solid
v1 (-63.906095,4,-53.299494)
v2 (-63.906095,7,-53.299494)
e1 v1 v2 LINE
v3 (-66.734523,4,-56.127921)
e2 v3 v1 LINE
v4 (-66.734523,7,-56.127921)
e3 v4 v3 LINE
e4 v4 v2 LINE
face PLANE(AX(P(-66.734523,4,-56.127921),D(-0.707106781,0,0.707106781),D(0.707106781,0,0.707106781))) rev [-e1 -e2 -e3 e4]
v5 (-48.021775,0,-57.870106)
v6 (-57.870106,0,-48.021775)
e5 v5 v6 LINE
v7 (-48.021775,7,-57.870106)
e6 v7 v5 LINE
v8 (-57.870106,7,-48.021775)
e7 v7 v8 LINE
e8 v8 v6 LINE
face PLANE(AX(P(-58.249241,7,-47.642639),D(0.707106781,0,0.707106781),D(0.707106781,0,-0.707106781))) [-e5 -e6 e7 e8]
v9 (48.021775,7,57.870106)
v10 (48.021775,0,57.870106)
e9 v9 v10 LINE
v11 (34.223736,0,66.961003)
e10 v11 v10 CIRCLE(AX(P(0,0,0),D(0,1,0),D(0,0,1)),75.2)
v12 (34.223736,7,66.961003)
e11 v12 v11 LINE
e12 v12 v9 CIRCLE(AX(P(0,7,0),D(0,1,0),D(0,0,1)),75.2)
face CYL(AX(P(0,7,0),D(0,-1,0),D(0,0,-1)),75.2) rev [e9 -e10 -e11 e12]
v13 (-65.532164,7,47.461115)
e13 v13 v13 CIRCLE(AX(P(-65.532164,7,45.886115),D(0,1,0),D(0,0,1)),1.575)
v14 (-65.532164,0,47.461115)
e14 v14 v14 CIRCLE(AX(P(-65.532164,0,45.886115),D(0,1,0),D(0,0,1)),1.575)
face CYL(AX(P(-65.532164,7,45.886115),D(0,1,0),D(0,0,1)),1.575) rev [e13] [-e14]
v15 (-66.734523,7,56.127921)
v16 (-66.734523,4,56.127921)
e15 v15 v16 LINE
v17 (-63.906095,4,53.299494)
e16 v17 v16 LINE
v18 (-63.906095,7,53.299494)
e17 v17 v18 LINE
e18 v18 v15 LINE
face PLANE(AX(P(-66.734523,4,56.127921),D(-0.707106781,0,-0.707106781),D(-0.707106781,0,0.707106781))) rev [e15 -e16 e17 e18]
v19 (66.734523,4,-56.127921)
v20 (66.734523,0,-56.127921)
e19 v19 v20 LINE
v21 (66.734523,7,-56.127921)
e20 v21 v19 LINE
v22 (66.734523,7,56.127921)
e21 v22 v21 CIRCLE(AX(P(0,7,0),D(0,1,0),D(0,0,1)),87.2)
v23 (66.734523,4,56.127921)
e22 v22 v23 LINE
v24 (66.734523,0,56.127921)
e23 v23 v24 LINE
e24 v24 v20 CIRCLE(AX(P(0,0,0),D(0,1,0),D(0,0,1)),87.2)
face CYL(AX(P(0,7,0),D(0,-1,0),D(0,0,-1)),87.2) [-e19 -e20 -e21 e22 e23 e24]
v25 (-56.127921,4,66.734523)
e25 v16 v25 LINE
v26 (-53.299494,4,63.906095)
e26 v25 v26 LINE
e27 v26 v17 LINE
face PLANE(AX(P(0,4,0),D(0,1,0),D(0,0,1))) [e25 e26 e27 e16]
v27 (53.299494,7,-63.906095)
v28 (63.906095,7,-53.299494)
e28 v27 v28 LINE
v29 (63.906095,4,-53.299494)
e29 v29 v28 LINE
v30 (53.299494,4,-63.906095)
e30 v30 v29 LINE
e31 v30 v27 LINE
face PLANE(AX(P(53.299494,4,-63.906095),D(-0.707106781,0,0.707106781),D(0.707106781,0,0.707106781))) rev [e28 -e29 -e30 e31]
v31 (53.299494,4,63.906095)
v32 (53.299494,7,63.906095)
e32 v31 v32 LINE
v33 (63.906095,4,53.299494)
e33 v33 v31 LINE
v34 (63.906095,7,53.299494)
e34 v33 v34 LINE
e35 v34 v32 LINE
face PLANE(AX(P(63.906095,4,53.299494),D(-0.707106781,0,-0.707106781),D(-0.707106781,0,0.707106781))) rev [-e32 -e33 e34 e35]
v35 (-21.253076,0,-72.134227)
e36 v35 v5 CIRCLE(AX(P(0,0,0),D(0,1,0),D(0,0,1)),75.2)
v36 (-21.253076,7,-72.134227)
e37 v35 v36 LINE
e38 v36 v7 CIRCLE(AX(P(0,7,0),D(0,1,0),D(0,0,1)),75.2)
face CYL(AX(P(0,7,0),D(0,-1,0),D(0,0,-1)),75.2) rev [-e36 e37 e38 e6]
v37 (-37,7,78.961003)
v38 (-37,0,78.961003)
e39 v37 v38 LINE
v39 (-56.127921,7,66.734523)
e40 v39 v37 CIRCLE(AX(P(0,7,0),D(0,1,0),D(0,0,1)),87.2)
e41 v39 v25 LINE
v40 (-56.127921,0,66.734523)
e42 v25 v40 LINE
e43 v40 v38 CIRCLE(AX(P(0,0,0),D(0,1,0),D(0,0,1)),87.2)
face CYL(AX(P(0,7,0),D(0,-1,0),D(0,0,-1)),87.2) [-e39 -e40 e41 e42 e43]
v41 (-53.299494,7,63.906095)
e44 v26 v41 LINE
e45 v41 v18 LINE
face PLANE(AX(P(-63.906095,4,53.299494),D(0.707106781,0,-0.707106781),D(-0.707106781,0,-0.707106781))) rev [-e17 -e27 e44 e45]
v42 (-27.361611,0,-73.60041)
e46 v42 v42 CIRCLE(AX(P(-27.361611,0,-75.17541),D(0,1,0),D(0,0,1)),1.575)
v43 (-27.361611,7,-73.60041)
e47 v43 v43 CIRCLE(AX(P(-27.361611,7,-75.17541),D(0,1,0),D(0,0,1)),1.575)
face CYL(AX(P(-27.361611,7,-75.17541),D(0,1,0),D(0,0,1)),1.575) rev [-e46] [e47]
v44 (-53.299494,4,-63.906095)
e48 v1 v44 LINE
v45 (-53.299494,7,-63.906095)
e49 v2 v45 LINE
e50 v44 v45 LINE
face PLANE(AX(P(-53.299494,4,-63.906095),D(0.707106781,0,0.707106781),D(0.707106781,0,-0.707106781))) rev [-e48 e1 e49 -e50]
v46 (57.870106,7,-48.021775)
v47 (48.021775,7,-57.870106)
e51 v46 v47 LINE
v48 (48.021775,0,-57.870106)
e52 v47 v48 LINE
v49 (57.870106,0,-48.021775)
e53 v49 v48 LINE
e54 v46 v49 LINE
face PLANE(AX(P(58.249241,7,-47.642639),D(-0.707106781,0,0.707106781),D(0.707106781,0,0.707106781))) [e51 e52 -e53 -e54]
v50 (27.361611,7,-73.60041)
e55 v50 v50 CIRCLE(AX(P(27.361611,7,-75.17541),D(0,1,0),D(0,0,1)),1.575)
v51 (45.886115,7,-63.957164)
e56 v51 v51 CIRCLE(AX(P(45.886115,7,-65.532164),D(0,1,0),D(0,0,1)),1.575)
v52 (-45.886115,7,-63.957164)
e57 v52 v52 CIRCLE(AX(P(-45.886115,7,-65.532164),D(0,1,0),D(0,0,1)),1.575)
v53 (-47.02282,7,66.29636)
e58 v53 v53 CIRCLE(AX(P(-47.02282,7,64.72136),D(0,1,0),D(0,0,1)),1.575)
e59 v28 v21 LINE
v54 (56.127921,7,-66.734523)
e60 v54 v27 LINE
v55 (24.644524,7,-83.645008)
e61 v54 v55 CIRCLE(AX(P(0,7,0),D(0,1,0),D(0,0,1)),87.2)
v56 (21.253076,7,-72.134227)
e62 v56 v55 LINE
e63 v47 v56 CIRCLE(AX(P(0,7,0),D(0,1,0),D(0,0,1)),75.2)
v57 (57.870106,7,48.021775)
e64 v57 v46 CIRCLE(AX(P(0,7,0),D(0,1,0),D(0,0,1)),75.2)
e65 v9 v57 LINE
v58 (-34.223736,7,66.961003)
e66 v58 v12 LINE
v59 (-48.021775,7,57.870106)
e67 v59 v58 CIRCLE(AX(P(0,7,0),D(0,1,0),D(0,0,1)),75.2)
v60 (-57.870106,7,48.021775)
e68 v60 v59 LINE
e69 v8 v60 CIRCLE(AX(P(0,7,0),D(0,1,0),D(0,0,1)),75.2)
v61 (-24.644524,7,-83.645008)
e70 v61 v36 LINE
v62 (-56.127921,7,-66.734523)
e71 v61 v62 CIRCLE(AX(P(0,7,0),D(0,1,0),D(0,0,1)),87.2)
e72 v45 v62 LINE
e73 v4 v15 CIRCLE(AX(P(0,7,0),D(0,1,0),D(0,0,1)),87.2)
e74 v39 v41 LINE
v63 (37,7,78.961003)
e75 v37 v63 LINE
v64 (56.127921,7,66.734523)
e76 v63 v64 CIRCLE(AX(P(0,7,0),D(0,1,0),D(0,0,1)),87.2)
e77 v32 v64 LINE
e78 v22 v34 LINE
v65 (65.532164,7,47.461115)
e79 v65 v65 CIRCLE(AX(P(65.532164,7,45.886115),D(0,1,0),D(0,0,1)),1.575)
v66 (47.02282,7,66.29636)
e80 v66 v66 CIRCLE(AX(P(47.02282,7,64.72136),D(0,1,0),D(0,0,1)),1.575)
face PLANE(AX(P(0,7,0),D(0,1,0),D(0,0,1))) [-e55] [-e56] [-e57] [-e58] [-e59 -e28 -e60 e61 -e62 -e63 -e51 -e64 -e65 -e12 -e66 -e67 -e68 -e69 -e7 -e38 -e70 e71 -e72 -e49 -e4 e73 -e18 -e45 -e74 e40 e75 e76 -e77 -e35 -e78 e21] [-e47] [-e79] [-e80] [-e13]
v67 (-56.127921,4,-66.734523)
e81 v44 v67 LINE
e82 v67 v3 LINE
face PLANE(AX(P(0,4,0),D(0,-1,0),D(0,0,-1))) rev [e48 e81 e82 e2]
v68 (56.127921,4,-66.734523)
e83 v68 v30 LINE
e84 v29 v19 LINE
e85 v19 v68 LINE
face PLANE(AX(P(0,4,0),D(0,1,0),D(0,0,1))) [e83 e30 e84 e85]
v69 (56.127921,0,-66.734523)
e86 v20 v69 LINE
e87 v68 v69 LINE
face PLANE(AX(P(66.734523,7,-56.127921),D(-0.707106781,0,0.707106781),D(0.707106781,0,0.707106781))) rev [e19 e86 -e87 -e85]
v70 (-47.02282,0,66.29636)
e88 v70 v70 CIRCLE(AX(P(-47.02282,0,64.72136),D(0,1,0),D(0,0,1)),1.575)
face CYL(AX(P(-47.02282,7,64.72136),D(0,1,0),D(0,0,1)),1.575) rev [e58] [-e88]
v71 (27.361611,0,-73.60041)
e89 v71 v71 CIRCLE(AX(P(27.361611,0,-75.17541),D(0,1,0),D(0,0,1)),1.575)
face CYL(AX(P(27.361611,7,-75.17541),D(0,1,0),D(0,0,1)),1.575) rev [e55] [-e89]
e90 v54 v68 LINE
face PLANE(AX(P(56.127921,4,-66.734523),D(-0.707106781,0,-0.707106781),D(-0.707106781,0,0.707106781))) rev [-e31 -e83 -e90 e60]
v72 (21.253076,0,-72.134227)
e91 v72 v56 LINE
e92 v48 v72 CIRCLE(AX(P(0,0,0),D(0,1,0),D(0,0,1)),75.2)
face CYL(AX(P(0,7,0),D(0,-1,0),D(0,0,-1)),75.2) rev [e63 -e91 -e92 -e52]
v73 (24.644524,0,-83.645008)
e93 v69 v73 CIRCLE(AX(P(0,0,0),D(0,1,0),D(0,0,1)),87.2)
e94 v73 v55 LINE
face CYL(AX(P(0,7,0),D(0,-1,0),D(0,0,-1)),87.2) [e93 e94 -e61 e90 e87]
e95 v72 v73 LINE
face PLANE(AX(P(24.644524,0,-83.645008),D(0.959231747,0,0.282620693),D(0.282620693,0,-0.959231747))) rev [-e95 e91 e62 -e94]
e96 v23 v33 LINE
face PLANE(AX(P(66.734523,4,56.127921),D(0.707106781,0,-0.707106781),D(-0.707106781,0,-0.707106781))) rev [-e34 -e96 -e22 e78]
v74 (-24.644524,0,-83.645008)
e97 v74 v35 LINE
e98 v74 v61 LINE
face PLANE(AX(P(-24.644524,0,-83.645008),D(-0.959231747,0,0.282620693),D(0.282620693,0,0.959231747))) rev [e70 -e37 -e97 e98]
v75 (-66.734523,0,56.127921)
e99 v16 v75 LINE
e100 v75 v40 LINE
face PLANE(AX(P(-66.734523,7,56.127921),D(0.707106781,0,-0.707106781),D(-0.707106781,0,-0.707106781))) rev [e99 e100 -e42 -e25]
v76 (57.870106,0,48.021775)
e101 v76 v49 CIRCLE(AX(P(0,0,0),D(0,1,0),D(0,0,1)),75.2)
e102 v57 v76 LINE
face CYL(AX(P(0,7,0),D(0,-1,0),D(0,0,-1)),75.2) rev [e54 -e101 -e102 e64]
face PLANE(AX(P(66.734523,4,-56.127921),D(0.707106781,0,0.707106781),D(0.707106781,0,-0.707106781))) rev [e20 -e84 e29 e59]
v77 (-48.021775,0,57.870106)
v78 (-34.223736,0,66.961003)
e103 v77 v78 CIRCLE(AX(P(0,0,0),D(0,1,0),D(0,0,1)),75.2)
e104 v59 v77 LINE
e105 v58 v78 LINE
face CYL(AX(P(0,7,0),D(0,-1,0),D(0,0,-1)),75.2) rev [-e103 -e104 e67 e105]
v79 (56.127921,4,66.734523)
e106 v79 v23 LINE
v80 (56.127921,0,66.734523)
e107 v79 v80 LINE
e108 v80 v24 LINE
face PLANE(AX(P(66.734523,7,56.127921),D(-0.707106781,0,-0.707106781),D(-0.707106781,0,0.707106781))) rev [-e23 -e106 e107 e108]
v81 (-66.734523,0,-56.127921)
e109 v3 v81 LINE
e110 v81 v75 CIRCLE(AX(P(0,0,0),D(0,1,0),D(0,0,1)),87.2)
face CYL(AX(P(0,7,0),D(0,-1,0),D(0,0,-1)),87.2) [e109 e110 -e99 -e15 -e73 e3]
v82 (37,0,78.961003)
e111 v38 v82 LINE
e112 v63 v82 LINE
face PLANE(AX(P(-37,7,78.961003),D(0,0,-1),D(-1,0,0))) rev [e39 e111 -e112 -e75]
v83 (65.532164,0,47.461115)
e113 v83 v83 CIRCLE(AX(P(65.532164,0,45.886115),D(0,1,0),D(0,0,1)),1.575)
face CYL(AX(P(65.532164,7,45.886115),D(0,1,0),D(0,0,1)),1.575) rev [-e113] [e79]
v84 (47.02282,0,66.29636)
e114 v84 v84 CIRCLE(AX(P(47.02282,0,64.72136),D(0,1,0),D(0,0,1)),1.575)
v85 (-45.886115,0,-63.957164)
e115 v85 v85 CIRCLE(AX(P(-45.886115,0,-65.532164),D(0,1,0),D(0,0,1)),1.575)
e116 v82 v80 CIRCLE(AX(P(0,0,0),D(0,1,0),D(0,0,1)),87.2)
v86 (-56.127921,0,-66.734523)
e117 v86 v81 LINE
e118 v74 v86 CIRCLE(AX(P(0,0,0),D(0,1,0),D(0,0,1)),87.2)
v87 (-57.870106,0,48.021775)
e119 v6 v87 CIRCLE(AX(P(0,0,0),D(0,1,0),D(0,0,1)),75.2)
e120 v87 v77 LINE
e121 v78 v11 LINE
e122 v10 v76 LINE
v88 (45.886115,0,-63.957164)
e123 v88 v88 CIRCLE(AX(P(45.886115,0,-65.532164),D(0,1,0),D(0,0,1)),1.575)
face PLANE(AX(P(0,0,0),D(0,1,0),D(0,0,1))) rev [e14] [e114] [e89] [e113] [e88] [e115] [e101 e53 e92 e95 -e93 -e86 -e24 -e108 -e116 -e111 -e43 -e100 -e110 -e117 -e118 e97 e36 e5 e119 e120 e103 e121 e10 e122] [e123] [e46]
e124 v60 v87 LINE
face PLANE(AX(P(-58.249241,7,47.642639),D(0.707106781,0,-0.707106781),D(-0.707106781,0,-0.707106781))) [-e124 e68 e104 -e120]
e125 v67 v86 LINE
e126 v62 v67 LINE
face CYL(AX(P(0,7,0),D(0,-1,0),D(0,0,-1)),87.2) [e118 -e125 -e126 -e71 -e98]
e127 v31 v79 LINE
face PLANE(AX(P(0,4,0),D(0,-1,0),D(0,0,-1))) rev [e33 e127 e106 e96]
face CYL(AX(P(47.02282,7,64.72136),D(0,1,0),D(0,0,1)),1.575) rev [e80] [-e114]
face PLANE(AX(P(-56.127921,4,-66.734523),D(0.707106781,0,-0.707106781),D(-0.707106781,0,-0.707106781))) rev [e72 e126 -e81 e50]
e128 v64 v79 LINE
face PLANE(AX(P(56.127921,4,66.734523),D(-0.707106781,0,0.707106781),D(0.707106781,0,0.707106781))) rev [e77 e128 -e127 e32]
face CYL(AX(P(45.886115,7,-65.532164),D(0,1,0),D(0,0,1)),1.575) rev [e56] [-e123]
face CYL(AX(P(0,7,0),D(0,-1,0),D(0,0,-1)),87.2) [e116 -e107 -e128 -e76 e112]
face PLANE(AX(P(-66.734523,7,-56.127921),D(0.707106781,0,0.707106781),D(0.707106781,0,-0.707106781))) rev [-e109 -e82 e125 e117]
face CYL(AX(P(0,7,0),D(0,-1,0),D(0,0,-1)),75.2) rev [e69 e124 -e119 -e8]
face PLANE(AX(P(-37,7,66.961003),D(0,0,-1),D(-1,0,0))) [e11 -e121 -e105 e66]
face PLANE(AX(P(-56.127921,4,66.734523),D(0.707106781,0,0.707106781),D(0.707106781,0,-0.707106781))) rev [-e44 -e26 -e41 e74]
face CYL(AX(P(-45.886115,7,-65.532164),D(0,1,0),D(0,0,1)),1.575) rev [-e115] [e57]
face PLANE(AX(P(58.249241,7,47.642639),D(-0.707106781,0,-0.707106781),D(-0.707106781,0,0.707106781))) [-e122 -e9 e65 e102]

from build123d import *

# Parameters (mm, degrees)
RESSALTO_EXTRUS_O1_DEPTH                = 7
CASCA1_DEPTH                            = 7
FURO_ROSCADO_PARA_CONDU_TE_DE_M3X0_51_D = 3.15
CORTE_EXTRUS_O1_DEPTH                   = 124.517933921
CORTE_EXTRUS_O2_DEPTH                   = 3


# Read off the part's stored shape, not the designer's step: Casca1
with BuildPart() as part:
    # Esboço1 → Ressalto-extrusão1 (new body)
    with BuildSketch(Plane(origin=(0, 0, 0), x_dir=(1, 0, 0), z_dir=(0, 1, 0))):
        with BuildLine():
            Line((-37, -78.961003033), (37, -78.961003033))
            ThreePointArc((37, -78.961003033), (46.963540288, -73.472892169), (56.127920845, -66.734522563))
            Line((56.127920845, -66.734522563), (66.734522563, -56.127920845))
            ThreePointArc((66.734522563, -56.127920845), (87.2, 0), (66.734522563, 56.127920845))
            Line((66.734522563, 56.127920845), (56.127920845, 66.734522563))
            ThreePointArc((56.127920845, 66.734522563), (0, 87.2), (-56.127920845, 66.734522563))
            Line((-56.127920845, 66.734522563), (-66.734522563, 56.127920845))
            ThreePointArc((-66.734522563, 56.127920845), (-87.2, 0), (-66.734522563, -56.127920845))
            Line((-66.734522563, -56.127920845), (-56.127920845, -66.734522563))
            ThreePointArc((-56.127920845, -66.734522563), (-46.963540288, -73.472892169), (-37, -78.961003033))
        make_face()
    extrude(amount=RESSALTO_EXTRUS_O1_DEPTH)

    # Casca1 outline → Casca1 (cut)
    with BuildSketch(Plane(origin=(0, 0, 0), x_dir=(1, 0, 0), z_dir=(0, 1, 0))):
        with BuildLine():
            ThreePointArc((-57.870105501, 48.021775158), (-75.2, 0), (-57.870105501, -48.021775158))
            Line((-57.870105501, -48.021775158), (-48.021775158, -57.870105501))
            ThreePointArc((-48.021775158, -57.870105501), (-41.373205231, -62.795683681), (-34.223735518, -66.961003033))
            Line((-34.223735518, -66.961003033), (34.223735518, -66.961003033))
            ThreePointArc((34.223735518, -66.961003033), (41.373205231, -62.795683681), (48.021775158, -57.870105501))
            Line((48.021775158, -57.870105501), (57.870105501, -48.021775158))
            ThreePointArc((57.870105501, -48.021775158), (75.2, 0), (57.870105501, 48.021775158))
            Line((57.870105501, 48.021775158), (48.021775158, 57.870105501))
            ThreePointArc((48.021775158, 57.870105501), (0, 75.2), (-48.021775158, 57.870105501))
            Line((-48.021775158, 57.870105501), (-57.870105501, 48.021775158))
        make_face()
    extrude(amount=CASCA1_DEPTH, mode=Mode.SUBTRACT)

    # Furo roscado para conduíte de M3x0.51 (through all)
    with Locations(Plane(origin=(0, 7, 0), x_dir=(1, 0, 0), z_dir=(0, 1, 0))):
        with Locations((-27.361611466, 75.175409663), (-47.022820183, -64.72135955), (47.022820183, -64.72135955), (27.361611466, 75.175409663), (-65.532163543, -45.886114908), (-45.886114908, 65.532163543), (65.532163543, -45.886114908), (45.886114908, 65.532163543)):
            Hole(FURO_ROSCADO_PARA_CONDU_TE_DE_M3X0_51_D / 2)

    # Esboço5 → Corte-extrusão1 (cut, through all)
    with BuildSketch(Plane(origin=(0, 7, 0), x_dir=(1, 0, 0), z_dir=(0, 1, 0))):
        with BuildLine():
            Line((-24.644524413, 83.645008318), (-21.253076099, 72.134227357))
            ThreePointArc((-21.253076099, 72.134227357), (0, 75.2), (21.253076099, 72.134227357))
            Line((21.253076099, 72.134227357), (24.644524413, 83.645008318))
            ThreePointArc((24.644524413, 83.645008318), (0, 87.2), (-24.644524413, 83.645008318))
        make_face()
    extrude(amount=-CORTE_EXTRUS_O1_DEPTH, mode=Mode.SUBTRACT)

    # Esboço8 → Corte-extrusão2 (cut)
    with BuildSketch(Plane(origin=(0, 7, 0), x_dir=(1, 0, 0), z_dir=(0, 1, 0))):
        Polygon((-66.734522563, -56.127920845), (-63.906095438, -53.29949372), (-53.29949372, -63.906095438), (-56.127920845, -66.734522563), align=None)
        Polygon((-56.127920845, 66.734522563), (-53.29949372, 63.906095438), (-63.906095438, 53.29949372), (-66.734522563, 56.127920845), align=None)
        Polygon((66.734522563, -56.127920845), (63.906095438, -53.29949372), (53.29949372, -63.906095438), (56.127920845, -66.734522563), align=None)
        Polygon((66.734522563, 56.127920845), (63.906095438, 53.29949372), (53.29949372, 63.906095438), (56.127920845, 66.734522563), align=None)
    extrude(amount=-CORTE_EXTRUS_O2_DEPTH, mode=Mode.SUBTRACT)


solid = part.part
